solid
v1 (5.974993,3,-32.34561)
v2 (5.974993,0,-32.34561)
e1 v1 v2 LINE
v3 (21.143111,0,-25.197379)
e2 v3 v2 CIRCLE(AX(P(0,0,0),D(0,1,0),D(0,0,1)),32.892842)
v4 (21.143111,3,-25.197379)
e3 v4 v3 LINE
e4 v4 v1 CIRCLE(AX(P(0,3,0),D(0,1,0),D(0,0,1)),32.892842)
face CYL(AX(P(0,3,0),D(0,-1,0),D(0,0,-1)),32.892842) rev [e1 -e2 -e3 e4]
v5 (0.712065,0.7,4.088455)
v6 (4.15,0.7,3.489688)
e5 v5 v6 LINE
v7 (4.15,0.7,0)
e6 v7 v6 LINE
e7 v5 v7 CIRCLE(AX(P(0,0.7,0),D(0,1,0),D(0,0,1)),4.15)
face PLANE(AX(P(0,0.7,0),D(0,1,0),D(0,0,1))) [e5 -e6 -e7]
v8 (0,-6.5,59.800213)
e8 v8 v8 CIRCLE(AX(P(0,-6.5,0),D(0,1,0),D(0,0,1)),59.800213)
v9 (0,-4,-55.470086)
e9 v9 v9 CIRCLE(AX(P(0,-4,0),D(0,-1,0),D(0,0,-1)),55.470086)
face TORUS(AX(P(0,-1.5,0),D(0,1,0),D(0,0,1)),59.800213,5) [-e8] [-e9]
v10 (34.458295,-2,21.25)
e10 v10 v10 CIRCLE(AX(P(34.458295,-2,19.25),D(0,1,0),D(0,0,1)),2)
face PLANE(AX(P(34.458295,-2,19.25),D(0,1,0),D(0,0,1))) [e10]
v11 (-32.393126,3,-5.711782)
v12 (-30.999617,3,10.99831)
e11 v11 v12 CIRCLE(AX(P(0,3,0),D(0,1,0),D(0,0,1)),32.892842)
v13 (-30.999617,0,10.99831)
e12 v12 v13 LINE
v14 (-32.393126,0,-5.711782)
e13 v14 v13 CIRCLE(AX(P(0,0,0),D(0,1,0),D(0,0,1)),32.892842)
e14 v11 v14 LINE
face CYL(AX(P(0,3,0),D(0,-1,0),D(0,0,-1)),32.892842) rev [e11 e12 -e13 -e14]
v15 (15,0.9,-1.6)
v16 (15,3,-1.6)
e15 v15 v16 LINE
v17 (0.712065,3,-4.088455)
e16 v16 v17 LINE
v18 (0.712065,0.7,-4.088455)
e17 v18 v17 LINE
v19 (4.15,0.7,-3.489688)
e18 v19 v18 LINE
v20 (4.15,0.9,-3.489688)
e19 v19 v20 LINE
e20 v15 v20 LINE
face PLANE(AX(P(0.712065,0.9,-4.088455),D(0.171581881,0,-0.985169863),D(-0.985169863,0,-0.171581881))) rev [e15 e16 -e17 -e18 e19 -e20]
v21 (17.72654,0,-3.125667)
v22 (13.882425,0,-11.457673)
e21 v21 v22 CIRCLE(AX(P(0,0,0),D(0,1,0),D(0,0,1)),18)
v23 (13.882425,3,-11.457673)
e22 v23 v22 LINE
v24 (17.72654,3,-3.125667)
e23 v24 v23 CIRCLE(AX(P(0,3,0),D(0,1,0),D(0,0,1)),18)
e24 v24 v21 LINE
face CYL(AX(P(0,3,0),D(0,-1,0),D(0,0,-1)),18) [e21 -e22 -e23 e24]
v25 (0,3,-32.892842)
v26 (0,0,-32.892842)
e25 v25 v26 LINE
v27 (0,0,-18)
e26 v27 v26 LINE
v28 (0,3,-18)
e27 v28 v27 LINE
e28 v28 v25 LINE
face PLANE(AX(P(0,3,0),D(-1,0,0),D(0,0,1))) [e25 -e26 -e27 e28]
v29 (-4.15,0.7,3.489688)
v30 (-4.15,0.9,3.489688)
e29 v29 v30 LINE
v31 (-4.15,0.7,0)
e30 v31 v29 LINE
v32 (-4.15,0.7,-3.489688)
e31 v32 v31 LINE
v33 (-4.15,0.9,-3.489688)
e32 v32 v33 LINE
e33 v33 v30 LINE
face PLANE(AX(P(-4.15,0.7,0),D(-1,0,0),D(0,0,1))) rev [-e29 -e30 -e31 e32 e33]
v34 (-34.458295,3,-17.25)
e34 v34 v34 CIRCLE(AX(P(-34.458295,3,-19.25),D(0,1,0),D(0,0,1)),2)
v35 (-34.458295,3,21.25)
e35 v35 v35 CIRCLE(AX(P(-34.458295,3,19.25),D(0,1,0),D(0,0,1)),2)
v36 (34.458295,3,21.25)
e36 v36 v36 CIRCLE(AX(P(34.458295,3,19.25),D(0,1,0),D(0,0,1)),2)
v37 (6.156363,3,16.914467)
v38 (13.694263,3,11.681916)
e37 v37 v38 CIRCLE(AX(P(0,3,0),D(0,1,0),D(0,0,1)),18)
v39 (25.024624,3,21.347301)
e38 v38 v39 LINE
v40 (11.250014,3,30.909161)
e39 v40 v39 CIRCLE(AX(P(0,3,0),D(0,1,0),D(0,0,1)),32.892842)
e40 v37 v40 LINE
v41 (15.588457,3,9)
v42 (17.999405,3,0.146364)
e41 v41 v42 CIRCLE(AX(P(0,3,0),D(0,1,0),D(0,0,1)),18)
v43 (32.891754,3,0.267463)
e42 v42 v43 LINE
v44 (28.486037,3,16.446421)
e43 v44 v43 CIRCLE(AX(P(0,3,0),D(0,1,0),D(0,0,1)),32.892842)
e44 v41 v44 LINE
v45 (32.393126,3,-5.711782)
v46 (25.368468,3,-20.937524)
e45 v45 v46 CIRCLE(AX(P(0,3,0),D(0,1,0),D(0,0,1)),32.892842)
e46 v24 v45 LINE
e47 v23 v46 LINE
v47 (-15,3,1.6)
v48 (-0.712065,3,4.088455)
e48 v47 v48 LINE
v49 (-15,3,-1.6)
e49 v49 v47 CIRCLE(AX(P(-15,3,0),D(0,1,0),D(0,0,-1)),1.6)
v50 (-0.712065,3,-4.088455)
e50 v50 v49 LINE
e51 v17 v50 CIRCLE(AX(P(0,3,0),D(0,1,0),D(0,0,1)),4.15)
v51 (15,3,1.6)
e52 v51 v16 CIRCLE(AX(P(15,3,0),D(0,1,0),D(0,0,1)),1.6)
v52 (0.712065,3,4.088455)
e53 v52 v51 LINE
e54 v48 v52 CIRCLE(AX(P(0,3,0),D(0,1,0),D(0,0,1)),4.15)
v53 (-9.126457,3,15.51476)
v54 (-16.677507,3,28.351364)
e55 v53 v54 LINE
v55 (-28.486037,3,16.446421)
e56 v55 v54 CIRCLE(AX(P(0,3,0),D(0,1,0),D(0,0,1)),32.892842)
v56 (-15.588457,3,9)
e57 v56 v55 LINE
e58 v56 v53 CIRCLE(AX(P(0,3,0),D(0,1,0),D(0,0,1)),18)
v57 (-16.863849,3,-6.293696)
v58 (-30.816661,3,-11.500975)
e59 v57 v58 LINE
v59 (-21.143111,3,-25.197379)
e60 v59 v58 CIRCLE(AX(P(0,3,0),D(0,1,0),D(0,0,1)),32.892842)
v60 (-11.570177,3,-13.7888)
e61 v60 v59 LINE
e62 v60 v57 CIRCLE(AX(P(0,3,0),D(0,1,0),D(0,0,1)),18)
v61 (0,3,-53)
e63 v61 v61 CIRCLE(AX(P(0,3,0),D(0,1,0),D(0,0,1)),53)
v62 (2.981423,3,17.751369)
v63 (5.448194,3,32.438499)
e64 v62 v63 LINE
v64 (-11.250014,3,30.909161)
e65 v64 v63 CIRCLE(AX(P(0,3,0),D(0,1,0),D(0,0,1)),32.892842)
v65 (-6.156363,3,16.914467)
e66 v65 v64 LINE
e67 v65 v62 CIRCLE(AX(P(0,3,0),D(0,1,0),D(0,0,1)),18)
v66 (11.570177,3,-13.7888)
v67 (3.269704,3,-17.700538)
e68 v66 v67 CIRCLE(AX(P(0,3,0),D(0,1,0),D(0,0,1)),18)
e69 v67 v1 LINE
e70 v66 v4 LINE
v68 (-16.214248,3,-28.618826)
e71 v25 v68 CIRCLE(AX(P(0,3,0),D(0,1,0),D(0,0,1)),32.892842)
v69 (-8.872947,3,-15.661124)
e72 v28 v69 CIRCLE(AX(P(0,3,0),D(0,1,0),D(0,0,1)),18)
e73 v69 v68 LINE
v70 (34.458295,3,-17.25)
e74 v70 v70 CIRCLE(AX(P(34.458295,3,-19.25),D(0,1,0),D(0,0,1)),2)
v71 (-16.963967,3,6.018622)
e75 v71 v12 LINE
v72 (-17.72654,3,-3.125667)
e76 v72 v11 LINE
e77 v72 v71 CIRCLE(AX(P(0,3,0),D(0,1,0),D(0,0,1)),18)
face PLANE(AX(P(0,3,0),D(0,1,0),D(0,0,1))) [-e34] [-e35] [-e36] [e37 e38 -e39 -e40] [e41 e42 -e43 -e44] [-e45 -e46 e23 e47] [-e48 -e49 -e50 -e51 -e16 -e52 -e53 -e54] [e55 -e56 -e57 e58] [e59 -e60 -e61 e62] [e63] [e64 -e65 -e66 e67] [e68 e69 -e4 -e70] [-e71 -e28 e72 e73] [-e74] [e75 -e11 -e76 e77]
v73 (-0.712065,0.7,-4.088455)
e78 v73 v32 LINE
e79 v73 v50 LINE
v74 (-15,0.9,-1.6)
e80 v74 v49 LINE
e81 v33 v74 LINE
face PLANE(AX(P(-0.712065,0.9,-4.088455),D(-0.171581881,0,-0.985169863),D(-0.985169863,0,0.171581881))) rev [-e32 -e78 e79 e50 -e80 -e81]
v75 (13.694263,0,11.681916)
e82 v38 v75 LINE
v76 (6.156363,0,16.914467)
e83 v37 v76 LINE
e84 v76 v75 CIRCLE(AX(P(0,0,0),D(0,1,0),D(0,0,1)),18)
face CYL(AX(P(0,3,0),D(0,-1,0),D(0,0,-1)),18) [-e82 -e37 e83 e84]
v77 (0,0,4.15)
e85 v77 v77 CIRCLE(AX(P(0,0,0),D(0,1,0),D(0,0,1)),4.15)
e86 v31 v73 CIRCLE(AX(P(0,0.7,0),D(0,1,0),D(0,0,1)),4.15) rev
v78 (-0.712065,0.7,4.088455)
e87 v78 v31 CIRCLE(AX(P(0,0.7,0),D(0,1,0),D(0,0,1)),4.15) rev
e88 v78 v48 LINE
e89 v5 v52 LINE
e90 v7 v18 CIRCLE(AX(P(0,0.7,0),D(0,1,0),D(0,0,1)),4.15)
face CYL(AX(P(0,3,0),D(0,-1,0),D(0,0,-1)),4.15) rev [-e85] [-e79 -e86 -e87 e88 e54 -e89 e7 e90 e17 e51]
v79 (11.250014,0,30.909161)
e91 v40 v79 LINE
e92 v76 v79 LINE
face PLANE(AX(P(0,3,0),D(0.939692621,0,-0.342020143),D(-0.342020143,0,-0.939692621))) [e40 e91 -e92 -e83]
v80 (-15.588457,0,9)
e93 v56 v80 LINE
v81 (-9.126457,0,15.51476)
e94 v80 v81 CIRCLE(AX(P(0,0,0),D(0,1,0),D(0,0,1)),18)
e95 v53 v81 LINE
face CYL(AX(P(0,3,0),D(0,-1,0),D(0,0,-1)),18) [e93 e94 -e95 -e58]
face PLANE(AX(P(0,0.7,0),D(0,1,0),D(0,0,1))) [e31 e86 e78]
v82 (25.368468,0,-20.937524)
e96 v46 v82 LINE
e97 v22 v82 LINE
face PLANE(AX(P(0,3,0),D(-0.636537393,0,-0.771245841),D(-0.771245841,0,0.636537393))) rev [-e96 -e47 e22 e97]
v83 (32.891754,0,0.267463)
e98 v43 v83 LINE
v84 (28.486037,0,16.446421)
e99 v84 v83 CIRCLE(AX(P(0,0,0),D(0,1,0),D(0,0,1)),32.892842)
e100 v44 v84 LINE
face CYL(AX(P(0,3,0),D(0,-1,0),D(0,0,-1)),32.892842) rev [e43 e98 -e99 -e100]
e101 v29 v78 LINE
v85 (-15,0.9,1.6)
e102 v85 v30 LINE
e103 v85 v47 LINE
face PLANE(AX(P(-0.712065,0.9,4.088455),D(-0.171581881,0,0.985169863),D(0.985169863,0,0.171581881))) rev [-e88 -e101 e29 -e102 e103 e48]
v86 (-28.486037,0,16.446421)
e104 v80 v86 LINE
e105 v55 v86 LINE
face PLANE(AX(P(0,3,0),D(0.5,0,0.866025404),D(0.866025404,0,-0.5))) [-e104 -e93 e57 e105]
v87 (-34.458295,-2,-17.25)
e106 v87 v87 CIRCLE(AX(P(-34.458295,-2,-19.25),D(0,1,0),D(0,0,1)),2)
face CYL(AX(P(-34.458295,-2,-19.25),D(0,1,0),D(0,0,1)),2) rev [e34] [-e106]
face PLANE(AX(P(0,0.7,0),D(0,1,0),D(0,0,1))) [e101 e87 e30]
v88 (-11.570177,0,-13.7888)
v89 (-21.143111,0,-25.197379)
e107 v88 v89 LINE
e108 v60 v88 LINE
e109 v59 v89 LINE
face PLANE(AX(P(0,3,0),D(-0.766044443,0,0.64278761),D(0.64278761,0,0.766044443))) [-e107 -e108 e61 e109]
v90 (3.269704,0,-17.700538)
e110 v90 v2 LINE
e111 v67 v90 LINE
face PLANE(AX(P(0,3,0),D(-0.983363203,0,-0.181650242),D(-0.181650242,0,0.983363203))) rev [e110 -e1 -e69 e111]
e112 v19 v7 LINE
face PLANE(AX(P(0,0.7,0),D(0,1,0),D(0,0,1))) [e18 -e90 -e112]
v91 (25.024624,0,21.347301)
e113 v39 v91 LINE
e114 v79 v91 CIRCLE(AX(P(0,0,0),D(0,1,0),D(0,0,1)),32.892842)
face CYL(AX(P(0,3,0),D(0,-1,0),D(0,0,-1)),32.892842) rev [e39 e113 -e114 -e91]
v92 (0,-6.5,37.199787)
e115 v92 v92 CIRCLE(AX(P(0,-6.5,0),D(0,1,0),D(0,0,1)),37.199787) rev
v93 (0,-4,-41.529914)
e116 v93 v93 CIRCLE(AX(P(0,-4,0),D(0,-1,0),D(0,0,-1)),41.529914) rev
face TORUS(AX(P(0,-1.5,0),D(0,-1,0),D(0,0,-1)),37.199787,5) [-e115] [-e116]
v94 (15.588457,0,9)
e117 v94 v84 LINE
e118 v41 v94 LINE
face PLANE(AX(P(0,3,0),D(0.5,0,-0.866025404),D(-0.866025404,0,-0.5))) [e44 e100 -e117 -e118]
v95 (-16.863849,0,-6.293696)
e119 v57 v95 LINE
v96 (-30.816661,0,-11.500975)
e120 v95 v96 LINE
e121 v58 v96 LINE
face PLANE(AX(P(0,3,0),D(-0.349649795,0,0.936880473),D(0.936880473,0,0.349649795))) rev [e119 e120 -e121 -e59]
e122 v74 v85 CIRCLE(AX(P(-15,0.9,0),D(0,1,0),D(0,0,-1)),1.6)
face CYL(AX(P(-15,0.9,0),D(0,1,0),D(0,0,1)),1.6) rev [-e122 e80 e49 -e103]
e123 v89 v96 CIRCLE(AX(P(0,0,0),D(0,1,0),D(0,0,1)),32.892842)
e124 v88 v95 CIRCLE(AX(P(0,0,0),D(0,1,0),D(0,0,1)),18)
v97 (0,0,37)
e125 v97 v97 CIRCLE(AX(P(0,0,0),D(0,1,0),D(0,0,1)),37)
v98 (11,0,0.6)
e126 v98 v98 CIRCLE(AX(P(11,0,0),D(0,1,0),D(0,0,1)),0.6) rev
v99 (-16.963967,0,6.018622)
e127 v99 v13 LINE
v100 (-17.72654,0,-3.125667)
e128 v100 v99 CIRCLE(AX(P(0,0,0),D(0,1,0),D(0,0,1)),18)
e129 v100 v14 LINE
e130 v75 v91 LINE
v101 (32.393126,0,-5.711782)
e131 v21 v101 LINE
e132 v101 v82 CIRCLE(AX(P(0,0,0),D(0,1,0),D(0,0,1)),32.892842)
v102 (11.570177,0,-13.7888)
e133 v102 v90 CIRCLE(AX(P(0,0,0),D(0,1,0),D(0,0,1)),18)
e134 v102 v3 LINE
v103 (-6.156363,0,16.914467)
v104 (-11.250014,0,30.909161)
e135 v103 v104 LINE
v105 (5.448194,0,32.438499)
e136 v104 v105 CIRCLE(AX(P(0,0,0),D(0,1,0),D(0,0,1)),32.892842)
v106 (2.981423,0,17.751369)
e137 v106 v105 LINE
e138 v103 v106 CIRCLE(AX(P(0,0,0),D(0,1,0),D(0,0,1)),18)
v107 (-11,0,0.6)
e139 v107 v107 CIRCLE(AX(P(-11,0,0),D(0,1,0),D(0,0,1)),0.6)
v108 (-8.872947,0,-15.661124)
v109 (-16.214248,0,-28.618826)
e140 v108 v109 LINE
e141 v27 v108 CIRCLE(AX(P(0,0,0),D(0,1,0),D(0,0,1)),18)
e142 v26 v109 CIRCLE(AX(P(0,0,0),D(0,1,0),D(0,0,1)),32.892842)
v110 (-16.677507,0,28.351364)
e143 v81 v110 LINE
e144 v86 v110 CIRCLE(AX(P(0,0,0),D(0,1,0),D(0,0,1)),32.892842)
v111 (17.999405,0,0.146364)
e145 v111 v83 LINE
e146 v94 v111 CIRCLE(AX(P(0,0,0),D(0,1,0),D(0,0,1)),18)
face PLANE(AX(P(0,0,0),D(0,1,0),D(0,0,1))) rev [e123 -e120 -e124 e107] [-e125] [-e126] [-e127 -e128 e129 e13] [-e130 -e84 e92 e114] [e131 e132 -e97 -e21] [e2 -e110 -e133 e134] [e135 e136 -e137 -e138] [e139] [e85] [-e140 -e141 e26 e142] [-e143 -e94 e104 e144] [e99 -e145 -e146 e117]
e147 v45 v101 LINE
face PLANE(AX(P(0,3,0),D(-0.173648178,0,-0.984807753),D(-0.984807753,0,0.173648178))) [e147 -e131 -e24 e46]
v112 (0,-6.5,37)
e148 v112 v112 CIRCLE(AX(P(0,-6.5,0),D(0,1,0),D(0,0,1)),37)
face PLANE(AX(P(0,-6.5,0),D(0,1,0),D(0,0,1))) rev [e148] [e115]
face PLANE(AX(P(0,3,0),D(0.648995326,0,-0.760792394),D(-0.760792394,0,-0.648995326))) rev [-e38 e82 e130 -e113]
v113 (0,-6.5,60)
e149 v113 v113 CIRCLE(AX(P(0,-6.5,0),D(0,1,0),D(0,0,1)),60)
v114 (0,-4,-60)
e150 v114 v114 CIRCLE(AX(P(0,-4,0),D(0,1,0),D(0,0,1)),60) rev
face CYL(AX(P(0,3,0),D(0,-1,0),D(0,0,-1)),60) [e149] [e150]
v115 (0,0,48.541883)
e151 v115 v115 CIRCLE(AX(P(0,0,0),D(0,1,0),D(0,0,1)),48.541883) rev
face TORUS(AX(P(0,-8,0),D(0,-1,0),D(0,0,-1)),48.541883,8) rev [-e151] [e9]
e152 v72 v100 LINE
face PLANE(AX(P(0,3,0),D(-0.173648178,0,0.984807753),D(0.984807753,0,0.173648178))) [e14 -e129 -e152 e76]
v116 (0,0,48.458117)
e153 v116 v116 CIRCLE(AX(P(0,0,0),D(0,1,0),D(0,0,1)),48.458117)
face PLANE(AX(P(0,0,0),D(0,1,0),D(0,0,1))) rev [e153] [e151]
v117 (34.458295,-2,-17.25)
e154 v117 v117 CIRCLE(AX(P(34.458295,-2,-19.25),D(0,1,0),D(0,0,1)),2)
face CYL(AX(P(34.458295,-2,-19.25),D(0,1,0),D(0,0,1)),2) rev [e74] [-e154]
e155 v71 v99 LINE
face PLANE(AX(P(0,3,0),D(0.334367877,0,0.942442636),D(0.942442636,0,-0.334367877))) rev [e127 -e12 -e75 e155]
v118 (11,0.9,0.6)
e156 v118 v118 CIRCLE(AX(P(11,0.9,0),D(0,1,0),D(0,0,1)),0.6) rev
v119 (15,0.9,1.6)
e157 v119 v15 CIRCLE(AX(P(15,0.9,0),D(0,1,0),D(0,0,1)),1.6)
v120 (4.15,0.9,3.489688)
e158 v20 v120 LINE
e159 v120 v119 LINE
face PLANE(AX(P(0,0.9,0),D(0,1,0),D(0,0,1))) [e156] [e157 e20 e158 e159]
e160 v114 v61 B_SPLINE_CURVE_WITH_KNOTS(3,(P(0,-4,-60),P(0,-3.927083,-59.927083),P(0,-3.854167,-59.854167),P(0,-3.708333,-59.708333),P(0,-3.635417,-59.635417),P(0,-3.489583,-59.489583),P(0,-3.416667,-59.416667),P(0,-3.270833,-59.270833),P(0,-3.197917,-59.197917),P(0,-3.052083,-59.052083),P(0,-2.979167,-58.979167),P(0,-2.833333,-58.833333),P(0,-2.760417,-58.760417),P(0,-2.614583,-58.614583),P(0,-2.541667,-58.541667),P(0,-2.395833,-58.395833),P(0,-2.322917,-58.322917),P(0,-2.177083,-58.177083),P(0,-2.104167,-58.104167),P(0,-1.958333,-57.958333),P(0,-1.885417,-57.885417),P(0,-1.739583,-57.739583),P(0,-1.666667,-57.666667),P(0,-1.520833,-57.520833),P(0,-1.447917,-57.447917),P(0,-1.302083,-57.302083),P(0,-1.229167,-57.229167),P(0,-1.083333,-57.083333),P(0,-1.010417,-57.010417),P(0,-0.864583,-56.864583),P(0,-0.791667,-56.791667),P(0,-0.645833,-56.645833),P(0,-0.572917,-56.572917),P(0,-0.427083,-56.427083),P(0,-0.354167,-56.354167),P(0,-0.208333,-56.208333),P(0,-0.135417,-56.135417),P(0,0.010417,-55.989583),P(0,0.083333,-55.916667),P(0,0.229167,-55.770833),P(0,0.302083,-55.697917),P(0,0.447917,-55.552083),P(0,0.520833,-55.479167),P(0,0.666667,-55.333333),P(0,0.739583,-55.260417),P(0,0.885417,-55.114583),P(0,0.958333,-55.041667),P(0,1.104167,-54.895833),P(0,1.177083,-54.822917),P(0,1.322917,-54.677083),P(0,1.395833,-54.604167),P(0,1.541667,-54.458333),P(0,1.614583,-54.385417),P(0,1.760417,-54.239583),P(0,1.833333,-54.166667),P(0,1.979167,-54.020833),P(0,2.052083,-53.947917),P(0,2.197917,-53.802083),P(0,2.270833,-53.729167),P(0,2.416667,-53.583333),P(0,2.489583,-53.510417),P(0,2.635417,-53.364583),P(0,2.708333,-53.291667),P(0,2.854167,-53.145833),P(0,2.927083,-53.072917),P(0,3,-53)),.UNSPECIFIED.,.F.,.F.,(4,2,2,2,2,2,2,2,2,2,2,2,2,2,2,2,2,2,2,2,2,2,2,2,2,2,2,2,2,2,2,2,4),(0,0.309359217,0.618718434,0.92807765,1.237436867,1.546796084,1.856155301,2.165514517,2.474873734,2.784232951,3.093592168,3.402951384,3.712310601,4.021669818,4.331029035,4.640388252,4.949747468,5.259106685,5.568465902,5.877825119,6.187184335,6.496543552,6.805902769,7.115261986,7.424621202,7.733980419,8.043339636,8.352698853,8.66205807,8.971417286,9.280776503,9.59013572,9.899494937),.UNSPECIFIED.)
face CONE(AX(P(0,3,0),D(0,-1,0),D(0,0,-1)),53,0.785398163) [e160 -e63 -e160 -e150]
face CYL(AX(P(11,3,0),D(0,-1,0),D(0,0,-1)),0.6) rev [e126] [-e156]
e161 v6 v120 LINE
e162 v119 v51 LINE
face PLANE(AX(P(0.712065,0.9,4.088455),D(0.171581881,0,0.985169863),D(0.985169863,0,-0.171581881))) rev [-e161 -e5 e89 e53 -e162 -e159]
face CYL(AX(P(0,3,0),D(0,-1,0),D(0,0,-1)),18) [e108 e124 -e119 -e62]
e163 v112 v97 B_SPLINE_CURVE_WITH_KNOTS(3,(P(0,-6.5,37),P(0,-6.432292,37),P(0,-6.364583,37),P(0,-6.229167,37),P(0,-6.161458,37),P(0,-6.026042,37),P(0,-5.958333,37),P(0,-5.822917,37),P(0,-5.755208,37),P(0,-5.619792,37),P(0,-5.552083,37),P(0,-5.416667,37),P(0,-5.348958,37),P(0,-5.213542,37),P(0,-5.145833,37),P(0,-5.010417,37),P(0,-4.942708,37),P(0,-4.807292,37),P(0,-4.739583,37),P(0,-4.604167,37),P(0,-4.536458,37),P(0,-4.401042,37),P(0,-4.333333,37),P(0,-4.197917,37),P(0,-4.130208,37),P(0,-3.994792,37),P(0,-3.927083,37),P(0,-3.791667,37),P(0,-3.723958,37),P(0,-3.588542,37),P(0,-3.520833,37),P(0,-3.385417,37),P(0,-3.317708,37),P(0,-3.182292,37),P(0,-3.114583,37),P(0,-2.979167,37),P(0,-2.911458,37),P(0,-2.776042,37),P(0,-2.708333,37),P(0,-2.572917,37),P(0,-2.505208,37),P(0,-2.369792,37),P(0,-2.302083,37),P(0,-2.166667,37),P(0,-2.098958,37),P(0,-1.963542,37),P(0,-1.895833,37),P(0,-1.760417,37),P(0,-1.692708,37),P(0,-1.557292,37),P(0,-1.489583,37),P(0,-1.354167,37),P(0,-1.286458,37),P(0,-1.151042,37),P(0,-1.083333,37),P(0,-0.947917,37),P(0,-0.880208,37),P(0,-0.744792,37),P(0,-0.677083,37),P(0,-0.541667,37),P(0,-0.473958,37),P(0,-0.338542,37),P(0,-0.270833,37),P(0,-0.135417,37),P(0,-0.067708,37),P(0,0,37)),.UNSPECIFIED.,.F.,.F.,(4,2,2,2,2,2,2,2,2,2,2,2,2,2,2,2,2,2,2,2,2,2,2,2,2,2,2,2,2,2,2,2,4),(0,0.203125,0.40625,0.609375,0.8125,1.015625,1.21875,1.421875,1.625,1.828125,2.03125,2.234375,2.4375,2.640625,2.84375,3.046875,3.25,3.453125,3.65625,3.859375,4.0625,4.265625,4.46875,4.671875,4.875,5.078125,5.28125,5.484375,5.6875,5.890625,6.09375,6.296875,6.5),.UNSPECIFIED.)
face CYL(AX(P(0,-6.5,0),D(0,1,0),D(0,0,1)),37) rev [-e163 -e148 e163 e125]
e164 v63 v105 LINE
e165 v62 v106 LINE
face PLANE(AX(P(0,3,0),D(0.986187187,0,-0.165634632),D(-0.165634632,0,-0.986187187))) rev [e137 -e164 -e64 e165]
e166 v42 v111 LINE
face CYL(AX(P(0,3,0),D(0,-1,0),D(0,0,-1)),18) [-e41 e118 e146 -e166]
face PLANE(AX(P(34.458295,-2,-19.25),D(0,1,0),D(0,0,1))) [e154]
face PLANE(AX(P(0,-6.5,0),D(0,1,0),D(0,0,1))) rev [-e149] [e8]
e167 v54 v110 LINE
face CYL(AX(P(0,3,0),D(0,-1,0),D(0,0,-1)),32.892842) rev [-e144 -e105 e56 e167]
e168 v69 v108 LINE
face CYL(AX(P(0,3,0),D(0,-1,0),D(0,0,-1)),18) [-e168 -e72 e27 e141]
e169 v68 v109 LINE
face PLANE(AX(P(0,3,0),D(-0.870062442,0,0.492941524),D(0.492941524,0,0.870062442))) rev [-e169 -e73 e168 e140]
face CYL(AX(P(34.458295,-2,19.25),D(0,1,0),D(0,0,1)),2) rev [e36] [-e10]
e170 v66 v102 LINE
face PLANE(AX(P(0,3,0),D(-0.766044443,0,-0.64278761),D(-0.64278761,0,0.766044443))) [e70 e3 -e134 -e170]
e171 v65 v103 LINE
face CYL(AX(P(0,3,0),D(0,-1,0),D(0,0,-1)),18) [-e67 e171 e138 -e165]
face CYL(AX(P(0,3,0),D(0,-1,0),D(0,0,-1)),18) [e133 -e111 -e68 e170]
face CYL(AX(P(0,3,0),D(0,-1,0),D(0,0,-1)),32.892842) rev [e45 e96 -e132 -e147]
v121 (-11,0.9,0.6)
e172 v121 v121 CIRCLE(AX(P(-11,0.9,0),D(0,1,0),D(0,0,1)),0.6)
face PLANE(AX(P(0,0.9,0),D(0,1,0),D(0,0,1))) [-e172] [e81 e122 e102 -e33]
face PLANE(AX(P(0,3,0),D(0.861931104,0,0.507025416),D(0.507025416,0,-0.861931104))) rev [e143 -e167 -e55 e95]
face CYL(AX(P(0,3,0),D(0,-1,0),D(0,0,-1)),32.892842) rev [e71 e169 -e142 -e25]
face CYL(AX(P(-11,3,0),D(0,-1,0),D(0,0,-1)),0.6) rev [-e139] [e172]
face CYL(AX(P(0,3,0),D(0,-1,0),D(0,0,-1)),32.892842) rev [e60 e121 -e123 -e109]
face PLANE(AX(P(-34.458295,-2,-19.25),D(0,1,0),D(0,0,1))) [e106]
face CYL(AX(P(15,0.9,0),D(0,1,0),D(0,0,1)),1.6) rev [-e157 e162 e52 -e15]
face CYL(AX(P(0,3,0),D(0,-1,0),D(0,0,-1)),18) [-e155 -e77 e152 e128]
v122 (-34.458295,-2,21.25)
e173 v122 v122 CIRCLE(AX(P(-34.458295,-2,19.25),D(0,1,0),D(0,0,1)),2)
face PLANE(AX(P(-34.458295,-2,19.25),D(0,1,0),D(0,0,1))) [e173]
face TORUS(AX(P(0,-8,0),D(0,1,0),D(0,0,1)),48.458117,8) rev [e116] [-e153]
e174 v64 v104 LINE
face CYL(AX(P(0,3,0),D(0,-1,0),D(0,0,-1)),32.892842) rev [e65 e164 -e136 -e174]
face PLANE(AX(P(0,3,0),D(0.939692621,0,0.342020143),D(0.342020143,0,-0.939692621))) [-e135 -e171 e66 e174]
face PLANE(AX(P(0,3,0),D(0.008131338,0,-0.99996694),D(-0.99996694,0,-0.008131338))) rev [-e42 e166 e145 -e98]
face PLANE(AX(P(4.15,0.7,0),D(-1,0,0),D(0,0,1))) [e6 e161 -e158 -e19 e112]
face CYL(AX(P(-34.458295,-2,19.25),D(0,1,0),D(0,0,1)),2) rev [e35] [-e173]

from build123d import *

# Parameters (mm, degrees)
SKETCH1_R           = 60
SKETCH1_R_2         = 4.15
SKETCH1_R_3         = 0.6
BOSS_EXTRUDE1_DEPTH = 3
BOSS_EXTRUDE2_START = -6.5
SKETCH1_5_R         = 60
SKETCH1_5_R_2       = 56.4
SKETCH1_5_R_3       = 40.6
SKETCH1_5_R_4       = 37
BOSS_EXTRUDE2_DEPTH = 6.5
FILLET1_R           = 8
CHAMFER1_SIZE       = 7
CUT_EXTRUDE1_START  = -2.1
CUT_EXTRUDE1_DEPTH  = 2.1
SKETCH3_R           = 2
CUT_EXTRUDE2_DEPTH  = 5
FILLET2_R           = 5
CUT_EXTRUDE4_START  = -0.2
CUT_EXTRUDE4_DEPTH  = 0.2


with BuildPart() as part:
    # Sketch1 → Boss-Extrude1 (new body)
    with BuildSketch(Plane(origin=(0, 0, 0), x_dir=(1, 0, 0), z_dir=(0, 1, 0))):
        with Locations(Location((0, 0, 0), (0, 0, 270))):
            Circle(SKETCH1_R)
        with Locations(Location((0, 0, 0), (0, 0, 270))):
            Circle(SKETCH1_R_2, mode=Mode.SUBTRACT)
        with Locations(Location((-11, 0, 0), (0, 0, 270))):
            Circle(SKETCH1_R_3, mode=Mode.SUBTRACT)
        with Locations(Location((11, 0, 0), (0, 0, 270))):
            Circle(SKETCH1_R_3, mode=Mode.SUBTRACT)
        with BuildLine():
            Line((-11.570176974, 13.788799976), (-21.143111218, 25.197378752))
            ThreePointArc((-21.143111218, 25.197378752), (-26.867310164, 18.975950371), (-30.816661277, 11.500975423))
            Line((-30.816661277, 11.500975423), (-16.863848516, 6.293696309))
            ThreePointArc((-16.863848516, 6.293696309), (-14.702639088, 10.384238241), (-11.570176974, 13.788799976))
        make_face(mode=Mode.SUBTRACT)
        with BuildLine():
            Line((-8.872947439, 15.661123962), (-16.214247626, 28.618826354))
            ThreePointArc((-16.214247626, 28.618826354), (-8.384047872, 31.806395414), (0, 32.892841895))
            Line((0, 32.892841895), (0, 18))
            ThreePointArc((0, 18), (-4.588015295, 17.405462236), (-8.872947439, 15.661123962))
        make_face(mode=Mode.SUBTRACT)
        with BuildLine():
            Line((3.269704356, 17.700537659), (5.974992691, 32.345610371))
            ThreePointArc((5.974992691, 32.345610371), (14.022203597, 29.754274554), (21.143111218, 25.197378752))
            Line((21.143111218, 25.197378752), (11.570176974, 13.788799976))
            ThreePointArc((11.570176974, 13.788799976), (7.673391845, 16.28247701), (3.269704356, 17.700537659))
        make_face(mode=Mode.SUBTRACT)
        with BuildLine():
            Line((13.882425145, 11.457673066), (25.368467523, 20.937523814))
            ThreePointArc((25.368467523, 20.937523814), (29.867310164, 13.779797948), (32.393125717, 5.711782053))
            Line((32.393125717, 5.711782053), (17.726539554, 3.125667198))
            ThreePointArc((17.726539554, 3.125667198), (16.34433366, 7.540739832), (13.882425145, 11.457673066))
        make_face(mode=Mode.SUBTRACT)
        with BuildLine():
            Line((15.588457268, -9), (28.486036684, -16.446420948))
            ThreePointArc((28.486036684, -16.446420948), (31.737170367, -8.642399263), (32.891754462, -0.26746283))
            Line((32.891754462, -0.26746283), (17.999404922, -0.146364092))
            ThreePointArc((17.999404922, -0.146364092), (17.367580109, -4.72939332), (15.588457268, -9))
        make_face(mode=Mode.SUBTRACT)
        with BuildLine():
            Line((13.694263095, -11.681915865), (25.024623937, -21.347300644))
            ThreePointArc((25.024623937, -21.347300644), (18.756855836, -27.020721809), (11.250014499, -30.909160806))
            Line((11.250014499, -30.909160806), (6.15636258, -16.914467174))
            ThreePointArc((6.15636258, -16.914467174), (10.264342805, -14.786590776), (13.694263095, -11.681915865))
        make_face(mode=Mode.SUBTRACT)
        with BuildLine():
            Line((2.981423371, -17.751369375), (5.448193754, -32.438499237))
            ThreePointArc((5.448193754, -32.438499237), (-3, -32.755748319), (-11.250014499, -30.909160806))
            Line((-11.250014499, -30.909160806), (-6.15636258, -16.914467174))
            ThreePointArc((-6.15636258, -16.914467174), (-1.641694572, -17.924978073), (2.981423371, -17.751369375))
        make_face(mode=Mode.SUBTRACT)
        with BuildLine():
            Line((-9.126457483, -15.51475987), (-16.677506836, -28.351363524))
            ThreePointArc((-16.677506836, -28.351363524), (-23.353122495, -23.163996151), (-28.486036684, -16.446420948))
            Line((-28.486036684, -16.446420948), (-15.588457268, -9))
            ThreePointArc((-15.588457268, -9), (-12.779564814, -12.676068916), (-9.126457483, -15.51475987))
        make_face(mode=Mode.SUBTRACT)
        with BuildLine():
            Line((-16.963967452, -6.018621794), (-30.999616628, -10.998309728))
            ThreePointArc((-30.999616628, -10.998309728), (-32.779059433, -2.733552745), (-32.393125717, 5.711782053))
            Line((-32.393125717, 5.711782053), (-17.726539554, 3.125667198))
            ThreePointArc((-17.726539554, 3.125667198), (-17.93773465, -1.495886234), (-16.963967452, -6.018621794))
        make_face(mode=Mode.SUBTRACT)
    extrude(amount=BOSS_EXTRUDE1_DEPTH)

    # Sketch1<5> → Boss-Extrude2 (add)
    # profile 1 of 2: a face of its own
    with BuildSketch(Plane(origin=(0, 0, 0), x_dir=(1, 0, 0), z_dir=(0, 1, 0)).offset(BOSS_EXTRUDE2_START)):
        with Locations(Location((0, 0, 0), (0, 0, 270))):
            Circle(SKETCH1_5_R)
        with Locations(Location((0, 0, 0), (0, 0, 270))):
            Circle(SKETCH1_5_R_2, mode=Mode.SUBTRACT)
    # profile 2 of 2: a face of its own
    with BuildSketch(Plane(origin=(0, 0, 0), x_dir=(1, 0, 0), z_dir=(0, 1, 0)).offset(BOSS_EXTRUDE2_START)):
        with Locations(Location((0, 0, 0), (0, 0, 270))):
            Circle(SKETCH1_5_R_3)
        with Locations(Location((0, 0, 0), (0, 0, 270))):
            Circle(SKETCH1_5_R_4, mode=Mode.SUBTRACT)
    extrude(amount=BOSS_EXTRUDE2_DEPTH)

    # Fillet1
    # the kernel refuses this fillet: 8 mm, written as the material it adds along each edge
    with BuildSketch(Plane(origin=(0, 0, 0), x_dir=(0, 0, 1), z_dir=(-1, 0, 0))) as fillet1_piece_1:
        with BuildLine():
            CenterArc((48.541883177, -8), FILLET1_R, 10.806922875, 79.193077125)
            Line((48.541883177, 0), (48.541883177, 0.16))
            Line((48.541883177, 0.16), (56.4, 0.16))
            Line((56.4, 0.16), (56.56, 0))
            ThreePointArc((56.56, 0), (56.56, -3.25), (56.557162336, -6.47))
            Line((56.557162336, -6.47), (56.4, -6.5))
        make_face()
    revolve(axis=Axis((0, 0, 0), (0, 1, 0)))
    with BuildSketch(Plane(origin=(0, 0, 0), x_dir=(0, 0, 1), z_dir=(-1, 0, 0))) as fillet1_piece_2:
        with BuildLine():
            CenterArc((48.458116823, -8), FILLET1_R, 90, 79.193077125)
            Line((40.6, -6.5), (40.442837664, -6.47))
            ThreePointArc((40.442837664, -6.47), (40.44, -3.25), (40.44, 0))
            Line((40.44, 0), (40.6, 0.16))
            Line((40.6, 0.16), (48.458116823, 0.16))
            Line((48.458116823, 0.16), (48.458116823, 0))
        make_face()
    revolve(axis=Axis((0, 0, 0), (0, 1, 0)))

    # Chamfer1
    chamfer1_edges = [part.edges().sort_by_distance(p)[0] for p in [
        (0, 3, -60),
    ]]
    chamfer(chamfer1_edges, length=CHAMFER1_SIZE)

    # Sketch2 → Cut-Extrude1 (cut)
    with BuildSketch(Plane(origin=(0, 3, 0), x_dir=(1, 0, 0), z_dir=(0, 1, 0)).offset(CUT_EXTRUDE1_START)):
        with BuildLine():
            Line((0.712064808, -4.088454929), (15, -1.6))
            ThreePointArc((15, -1.6), (16.6, 0), (15, 1.6))
            Line((15, 1.6), (0.712064808, 4.088454929))
            ThreePointArc((0.712064808, 4.088454929), (0, 4.15), (-0.712064808, 4.088454929))
            Line((-0.712064808, 4.088454929), (-15, 1.6))
            ThreePointArc((-15, 1.6), (-16.6, 0), (-15, -1.6))
            Line((-15, -1.6), (-0.712064808, -4.088454929))
            ThreePointArc((-0.712064808, -4.088454929), (0, -4.15), (0.712064808, -4.088454929))
        make_face()
    extrude(amount=CUT_EXTRUDE1_DEPTH, mode=Mode.SUBTRACT)

    # Sketch3 → Cut-Extrude2 (cut)
    with BuildSketch(Plane(origin=(0, 3, 0), x_dir=(1, 0, 0), z_dir=(0, 1, 0))):
        with Locations(Location((-34.458294856, -19.25, 0), (0, 0, 270))):
            Circle(SKETCH3_R)
        with Locations(Location((-34.458294856, 19.25, 0), (0, 0, 270))):
            Circle(SKETCH3_R)
        with Locations(Location((34.458294856, 19.25, 0), (0, 0, 270))):
            Circle(SKETCH3_R)
        with Locations(Location((34.458294856, -19.25, 0), (0, 0, 270))):
            Circle(SKETCH3_R)
    extrude(amount=-CUT_EXTRUDE2_DEPTH, mode=Mode.SUBTRACT)

    # Fillet2
    fillet2_edges = [part.edges().sort_by_distance(p)[0] for p in [
        (0, -6.5, -56.4),
        (0, -6.5, -40.6),
    ]]
    fillet(fillet2_edges, radius=FILLET2_R)

    # Sketch4 → Cut-Extrude4 (cut)
    with BuildSketch(Plane(origin=(0, 0.9, 0), x_dir=(1, 0, 0), z_dir=(0, 1, 0)).offset(CUT_EXTRUDE4_START)):
        with BuildLine():
            ThreePointArc((-4.15, -1e-08), (-3.1762847, 2.670901627), (-0.712064808, 4.088454929))
            Line((-0.712064808, 4.088454929), (-4.15, 3.489687741))
            Line((-4.15, 3.489687741), (-4.15, -1e-08))
        make_face()
        with BuildLine():
            ThreePointArc((-0.712064808, -4.088454929), (-3.176284694, -2.670901635), (-4.15, -1e-08))
            Line((-4.15, -1e-08), (-4.15, -3.489687741))
            Line((-4.15, -3.489687741), (-0.712064808, -4.088454929))
        make_face()
        with BuildLine():
            ThreePointArc((0.712064808, 4.088454929), (3.176284696, 2.670901632), (4.15, 3e-09))
            Line((4.15, 3e-09), (4.15, 3.489687741))
            Line((4.15, 3.489687741), (0.712064808, 4.088454929))
        make_face()
        with BuildLine():
            ThreePointArc((4.15, 3e-09), (3.176284698, -2.67090163), (0.712064808, -4.088454929))
            Line((0.712064808, -4.088454929), (4.15, -3.489687741))
            Line((4.15, -3.489687741), (4.15, 3e-09))
        make_face()
    extrude(amount=CUT_EXTRUDE4_DEPTH, mode=Mode.SUBTRACT)


solid = part.part
